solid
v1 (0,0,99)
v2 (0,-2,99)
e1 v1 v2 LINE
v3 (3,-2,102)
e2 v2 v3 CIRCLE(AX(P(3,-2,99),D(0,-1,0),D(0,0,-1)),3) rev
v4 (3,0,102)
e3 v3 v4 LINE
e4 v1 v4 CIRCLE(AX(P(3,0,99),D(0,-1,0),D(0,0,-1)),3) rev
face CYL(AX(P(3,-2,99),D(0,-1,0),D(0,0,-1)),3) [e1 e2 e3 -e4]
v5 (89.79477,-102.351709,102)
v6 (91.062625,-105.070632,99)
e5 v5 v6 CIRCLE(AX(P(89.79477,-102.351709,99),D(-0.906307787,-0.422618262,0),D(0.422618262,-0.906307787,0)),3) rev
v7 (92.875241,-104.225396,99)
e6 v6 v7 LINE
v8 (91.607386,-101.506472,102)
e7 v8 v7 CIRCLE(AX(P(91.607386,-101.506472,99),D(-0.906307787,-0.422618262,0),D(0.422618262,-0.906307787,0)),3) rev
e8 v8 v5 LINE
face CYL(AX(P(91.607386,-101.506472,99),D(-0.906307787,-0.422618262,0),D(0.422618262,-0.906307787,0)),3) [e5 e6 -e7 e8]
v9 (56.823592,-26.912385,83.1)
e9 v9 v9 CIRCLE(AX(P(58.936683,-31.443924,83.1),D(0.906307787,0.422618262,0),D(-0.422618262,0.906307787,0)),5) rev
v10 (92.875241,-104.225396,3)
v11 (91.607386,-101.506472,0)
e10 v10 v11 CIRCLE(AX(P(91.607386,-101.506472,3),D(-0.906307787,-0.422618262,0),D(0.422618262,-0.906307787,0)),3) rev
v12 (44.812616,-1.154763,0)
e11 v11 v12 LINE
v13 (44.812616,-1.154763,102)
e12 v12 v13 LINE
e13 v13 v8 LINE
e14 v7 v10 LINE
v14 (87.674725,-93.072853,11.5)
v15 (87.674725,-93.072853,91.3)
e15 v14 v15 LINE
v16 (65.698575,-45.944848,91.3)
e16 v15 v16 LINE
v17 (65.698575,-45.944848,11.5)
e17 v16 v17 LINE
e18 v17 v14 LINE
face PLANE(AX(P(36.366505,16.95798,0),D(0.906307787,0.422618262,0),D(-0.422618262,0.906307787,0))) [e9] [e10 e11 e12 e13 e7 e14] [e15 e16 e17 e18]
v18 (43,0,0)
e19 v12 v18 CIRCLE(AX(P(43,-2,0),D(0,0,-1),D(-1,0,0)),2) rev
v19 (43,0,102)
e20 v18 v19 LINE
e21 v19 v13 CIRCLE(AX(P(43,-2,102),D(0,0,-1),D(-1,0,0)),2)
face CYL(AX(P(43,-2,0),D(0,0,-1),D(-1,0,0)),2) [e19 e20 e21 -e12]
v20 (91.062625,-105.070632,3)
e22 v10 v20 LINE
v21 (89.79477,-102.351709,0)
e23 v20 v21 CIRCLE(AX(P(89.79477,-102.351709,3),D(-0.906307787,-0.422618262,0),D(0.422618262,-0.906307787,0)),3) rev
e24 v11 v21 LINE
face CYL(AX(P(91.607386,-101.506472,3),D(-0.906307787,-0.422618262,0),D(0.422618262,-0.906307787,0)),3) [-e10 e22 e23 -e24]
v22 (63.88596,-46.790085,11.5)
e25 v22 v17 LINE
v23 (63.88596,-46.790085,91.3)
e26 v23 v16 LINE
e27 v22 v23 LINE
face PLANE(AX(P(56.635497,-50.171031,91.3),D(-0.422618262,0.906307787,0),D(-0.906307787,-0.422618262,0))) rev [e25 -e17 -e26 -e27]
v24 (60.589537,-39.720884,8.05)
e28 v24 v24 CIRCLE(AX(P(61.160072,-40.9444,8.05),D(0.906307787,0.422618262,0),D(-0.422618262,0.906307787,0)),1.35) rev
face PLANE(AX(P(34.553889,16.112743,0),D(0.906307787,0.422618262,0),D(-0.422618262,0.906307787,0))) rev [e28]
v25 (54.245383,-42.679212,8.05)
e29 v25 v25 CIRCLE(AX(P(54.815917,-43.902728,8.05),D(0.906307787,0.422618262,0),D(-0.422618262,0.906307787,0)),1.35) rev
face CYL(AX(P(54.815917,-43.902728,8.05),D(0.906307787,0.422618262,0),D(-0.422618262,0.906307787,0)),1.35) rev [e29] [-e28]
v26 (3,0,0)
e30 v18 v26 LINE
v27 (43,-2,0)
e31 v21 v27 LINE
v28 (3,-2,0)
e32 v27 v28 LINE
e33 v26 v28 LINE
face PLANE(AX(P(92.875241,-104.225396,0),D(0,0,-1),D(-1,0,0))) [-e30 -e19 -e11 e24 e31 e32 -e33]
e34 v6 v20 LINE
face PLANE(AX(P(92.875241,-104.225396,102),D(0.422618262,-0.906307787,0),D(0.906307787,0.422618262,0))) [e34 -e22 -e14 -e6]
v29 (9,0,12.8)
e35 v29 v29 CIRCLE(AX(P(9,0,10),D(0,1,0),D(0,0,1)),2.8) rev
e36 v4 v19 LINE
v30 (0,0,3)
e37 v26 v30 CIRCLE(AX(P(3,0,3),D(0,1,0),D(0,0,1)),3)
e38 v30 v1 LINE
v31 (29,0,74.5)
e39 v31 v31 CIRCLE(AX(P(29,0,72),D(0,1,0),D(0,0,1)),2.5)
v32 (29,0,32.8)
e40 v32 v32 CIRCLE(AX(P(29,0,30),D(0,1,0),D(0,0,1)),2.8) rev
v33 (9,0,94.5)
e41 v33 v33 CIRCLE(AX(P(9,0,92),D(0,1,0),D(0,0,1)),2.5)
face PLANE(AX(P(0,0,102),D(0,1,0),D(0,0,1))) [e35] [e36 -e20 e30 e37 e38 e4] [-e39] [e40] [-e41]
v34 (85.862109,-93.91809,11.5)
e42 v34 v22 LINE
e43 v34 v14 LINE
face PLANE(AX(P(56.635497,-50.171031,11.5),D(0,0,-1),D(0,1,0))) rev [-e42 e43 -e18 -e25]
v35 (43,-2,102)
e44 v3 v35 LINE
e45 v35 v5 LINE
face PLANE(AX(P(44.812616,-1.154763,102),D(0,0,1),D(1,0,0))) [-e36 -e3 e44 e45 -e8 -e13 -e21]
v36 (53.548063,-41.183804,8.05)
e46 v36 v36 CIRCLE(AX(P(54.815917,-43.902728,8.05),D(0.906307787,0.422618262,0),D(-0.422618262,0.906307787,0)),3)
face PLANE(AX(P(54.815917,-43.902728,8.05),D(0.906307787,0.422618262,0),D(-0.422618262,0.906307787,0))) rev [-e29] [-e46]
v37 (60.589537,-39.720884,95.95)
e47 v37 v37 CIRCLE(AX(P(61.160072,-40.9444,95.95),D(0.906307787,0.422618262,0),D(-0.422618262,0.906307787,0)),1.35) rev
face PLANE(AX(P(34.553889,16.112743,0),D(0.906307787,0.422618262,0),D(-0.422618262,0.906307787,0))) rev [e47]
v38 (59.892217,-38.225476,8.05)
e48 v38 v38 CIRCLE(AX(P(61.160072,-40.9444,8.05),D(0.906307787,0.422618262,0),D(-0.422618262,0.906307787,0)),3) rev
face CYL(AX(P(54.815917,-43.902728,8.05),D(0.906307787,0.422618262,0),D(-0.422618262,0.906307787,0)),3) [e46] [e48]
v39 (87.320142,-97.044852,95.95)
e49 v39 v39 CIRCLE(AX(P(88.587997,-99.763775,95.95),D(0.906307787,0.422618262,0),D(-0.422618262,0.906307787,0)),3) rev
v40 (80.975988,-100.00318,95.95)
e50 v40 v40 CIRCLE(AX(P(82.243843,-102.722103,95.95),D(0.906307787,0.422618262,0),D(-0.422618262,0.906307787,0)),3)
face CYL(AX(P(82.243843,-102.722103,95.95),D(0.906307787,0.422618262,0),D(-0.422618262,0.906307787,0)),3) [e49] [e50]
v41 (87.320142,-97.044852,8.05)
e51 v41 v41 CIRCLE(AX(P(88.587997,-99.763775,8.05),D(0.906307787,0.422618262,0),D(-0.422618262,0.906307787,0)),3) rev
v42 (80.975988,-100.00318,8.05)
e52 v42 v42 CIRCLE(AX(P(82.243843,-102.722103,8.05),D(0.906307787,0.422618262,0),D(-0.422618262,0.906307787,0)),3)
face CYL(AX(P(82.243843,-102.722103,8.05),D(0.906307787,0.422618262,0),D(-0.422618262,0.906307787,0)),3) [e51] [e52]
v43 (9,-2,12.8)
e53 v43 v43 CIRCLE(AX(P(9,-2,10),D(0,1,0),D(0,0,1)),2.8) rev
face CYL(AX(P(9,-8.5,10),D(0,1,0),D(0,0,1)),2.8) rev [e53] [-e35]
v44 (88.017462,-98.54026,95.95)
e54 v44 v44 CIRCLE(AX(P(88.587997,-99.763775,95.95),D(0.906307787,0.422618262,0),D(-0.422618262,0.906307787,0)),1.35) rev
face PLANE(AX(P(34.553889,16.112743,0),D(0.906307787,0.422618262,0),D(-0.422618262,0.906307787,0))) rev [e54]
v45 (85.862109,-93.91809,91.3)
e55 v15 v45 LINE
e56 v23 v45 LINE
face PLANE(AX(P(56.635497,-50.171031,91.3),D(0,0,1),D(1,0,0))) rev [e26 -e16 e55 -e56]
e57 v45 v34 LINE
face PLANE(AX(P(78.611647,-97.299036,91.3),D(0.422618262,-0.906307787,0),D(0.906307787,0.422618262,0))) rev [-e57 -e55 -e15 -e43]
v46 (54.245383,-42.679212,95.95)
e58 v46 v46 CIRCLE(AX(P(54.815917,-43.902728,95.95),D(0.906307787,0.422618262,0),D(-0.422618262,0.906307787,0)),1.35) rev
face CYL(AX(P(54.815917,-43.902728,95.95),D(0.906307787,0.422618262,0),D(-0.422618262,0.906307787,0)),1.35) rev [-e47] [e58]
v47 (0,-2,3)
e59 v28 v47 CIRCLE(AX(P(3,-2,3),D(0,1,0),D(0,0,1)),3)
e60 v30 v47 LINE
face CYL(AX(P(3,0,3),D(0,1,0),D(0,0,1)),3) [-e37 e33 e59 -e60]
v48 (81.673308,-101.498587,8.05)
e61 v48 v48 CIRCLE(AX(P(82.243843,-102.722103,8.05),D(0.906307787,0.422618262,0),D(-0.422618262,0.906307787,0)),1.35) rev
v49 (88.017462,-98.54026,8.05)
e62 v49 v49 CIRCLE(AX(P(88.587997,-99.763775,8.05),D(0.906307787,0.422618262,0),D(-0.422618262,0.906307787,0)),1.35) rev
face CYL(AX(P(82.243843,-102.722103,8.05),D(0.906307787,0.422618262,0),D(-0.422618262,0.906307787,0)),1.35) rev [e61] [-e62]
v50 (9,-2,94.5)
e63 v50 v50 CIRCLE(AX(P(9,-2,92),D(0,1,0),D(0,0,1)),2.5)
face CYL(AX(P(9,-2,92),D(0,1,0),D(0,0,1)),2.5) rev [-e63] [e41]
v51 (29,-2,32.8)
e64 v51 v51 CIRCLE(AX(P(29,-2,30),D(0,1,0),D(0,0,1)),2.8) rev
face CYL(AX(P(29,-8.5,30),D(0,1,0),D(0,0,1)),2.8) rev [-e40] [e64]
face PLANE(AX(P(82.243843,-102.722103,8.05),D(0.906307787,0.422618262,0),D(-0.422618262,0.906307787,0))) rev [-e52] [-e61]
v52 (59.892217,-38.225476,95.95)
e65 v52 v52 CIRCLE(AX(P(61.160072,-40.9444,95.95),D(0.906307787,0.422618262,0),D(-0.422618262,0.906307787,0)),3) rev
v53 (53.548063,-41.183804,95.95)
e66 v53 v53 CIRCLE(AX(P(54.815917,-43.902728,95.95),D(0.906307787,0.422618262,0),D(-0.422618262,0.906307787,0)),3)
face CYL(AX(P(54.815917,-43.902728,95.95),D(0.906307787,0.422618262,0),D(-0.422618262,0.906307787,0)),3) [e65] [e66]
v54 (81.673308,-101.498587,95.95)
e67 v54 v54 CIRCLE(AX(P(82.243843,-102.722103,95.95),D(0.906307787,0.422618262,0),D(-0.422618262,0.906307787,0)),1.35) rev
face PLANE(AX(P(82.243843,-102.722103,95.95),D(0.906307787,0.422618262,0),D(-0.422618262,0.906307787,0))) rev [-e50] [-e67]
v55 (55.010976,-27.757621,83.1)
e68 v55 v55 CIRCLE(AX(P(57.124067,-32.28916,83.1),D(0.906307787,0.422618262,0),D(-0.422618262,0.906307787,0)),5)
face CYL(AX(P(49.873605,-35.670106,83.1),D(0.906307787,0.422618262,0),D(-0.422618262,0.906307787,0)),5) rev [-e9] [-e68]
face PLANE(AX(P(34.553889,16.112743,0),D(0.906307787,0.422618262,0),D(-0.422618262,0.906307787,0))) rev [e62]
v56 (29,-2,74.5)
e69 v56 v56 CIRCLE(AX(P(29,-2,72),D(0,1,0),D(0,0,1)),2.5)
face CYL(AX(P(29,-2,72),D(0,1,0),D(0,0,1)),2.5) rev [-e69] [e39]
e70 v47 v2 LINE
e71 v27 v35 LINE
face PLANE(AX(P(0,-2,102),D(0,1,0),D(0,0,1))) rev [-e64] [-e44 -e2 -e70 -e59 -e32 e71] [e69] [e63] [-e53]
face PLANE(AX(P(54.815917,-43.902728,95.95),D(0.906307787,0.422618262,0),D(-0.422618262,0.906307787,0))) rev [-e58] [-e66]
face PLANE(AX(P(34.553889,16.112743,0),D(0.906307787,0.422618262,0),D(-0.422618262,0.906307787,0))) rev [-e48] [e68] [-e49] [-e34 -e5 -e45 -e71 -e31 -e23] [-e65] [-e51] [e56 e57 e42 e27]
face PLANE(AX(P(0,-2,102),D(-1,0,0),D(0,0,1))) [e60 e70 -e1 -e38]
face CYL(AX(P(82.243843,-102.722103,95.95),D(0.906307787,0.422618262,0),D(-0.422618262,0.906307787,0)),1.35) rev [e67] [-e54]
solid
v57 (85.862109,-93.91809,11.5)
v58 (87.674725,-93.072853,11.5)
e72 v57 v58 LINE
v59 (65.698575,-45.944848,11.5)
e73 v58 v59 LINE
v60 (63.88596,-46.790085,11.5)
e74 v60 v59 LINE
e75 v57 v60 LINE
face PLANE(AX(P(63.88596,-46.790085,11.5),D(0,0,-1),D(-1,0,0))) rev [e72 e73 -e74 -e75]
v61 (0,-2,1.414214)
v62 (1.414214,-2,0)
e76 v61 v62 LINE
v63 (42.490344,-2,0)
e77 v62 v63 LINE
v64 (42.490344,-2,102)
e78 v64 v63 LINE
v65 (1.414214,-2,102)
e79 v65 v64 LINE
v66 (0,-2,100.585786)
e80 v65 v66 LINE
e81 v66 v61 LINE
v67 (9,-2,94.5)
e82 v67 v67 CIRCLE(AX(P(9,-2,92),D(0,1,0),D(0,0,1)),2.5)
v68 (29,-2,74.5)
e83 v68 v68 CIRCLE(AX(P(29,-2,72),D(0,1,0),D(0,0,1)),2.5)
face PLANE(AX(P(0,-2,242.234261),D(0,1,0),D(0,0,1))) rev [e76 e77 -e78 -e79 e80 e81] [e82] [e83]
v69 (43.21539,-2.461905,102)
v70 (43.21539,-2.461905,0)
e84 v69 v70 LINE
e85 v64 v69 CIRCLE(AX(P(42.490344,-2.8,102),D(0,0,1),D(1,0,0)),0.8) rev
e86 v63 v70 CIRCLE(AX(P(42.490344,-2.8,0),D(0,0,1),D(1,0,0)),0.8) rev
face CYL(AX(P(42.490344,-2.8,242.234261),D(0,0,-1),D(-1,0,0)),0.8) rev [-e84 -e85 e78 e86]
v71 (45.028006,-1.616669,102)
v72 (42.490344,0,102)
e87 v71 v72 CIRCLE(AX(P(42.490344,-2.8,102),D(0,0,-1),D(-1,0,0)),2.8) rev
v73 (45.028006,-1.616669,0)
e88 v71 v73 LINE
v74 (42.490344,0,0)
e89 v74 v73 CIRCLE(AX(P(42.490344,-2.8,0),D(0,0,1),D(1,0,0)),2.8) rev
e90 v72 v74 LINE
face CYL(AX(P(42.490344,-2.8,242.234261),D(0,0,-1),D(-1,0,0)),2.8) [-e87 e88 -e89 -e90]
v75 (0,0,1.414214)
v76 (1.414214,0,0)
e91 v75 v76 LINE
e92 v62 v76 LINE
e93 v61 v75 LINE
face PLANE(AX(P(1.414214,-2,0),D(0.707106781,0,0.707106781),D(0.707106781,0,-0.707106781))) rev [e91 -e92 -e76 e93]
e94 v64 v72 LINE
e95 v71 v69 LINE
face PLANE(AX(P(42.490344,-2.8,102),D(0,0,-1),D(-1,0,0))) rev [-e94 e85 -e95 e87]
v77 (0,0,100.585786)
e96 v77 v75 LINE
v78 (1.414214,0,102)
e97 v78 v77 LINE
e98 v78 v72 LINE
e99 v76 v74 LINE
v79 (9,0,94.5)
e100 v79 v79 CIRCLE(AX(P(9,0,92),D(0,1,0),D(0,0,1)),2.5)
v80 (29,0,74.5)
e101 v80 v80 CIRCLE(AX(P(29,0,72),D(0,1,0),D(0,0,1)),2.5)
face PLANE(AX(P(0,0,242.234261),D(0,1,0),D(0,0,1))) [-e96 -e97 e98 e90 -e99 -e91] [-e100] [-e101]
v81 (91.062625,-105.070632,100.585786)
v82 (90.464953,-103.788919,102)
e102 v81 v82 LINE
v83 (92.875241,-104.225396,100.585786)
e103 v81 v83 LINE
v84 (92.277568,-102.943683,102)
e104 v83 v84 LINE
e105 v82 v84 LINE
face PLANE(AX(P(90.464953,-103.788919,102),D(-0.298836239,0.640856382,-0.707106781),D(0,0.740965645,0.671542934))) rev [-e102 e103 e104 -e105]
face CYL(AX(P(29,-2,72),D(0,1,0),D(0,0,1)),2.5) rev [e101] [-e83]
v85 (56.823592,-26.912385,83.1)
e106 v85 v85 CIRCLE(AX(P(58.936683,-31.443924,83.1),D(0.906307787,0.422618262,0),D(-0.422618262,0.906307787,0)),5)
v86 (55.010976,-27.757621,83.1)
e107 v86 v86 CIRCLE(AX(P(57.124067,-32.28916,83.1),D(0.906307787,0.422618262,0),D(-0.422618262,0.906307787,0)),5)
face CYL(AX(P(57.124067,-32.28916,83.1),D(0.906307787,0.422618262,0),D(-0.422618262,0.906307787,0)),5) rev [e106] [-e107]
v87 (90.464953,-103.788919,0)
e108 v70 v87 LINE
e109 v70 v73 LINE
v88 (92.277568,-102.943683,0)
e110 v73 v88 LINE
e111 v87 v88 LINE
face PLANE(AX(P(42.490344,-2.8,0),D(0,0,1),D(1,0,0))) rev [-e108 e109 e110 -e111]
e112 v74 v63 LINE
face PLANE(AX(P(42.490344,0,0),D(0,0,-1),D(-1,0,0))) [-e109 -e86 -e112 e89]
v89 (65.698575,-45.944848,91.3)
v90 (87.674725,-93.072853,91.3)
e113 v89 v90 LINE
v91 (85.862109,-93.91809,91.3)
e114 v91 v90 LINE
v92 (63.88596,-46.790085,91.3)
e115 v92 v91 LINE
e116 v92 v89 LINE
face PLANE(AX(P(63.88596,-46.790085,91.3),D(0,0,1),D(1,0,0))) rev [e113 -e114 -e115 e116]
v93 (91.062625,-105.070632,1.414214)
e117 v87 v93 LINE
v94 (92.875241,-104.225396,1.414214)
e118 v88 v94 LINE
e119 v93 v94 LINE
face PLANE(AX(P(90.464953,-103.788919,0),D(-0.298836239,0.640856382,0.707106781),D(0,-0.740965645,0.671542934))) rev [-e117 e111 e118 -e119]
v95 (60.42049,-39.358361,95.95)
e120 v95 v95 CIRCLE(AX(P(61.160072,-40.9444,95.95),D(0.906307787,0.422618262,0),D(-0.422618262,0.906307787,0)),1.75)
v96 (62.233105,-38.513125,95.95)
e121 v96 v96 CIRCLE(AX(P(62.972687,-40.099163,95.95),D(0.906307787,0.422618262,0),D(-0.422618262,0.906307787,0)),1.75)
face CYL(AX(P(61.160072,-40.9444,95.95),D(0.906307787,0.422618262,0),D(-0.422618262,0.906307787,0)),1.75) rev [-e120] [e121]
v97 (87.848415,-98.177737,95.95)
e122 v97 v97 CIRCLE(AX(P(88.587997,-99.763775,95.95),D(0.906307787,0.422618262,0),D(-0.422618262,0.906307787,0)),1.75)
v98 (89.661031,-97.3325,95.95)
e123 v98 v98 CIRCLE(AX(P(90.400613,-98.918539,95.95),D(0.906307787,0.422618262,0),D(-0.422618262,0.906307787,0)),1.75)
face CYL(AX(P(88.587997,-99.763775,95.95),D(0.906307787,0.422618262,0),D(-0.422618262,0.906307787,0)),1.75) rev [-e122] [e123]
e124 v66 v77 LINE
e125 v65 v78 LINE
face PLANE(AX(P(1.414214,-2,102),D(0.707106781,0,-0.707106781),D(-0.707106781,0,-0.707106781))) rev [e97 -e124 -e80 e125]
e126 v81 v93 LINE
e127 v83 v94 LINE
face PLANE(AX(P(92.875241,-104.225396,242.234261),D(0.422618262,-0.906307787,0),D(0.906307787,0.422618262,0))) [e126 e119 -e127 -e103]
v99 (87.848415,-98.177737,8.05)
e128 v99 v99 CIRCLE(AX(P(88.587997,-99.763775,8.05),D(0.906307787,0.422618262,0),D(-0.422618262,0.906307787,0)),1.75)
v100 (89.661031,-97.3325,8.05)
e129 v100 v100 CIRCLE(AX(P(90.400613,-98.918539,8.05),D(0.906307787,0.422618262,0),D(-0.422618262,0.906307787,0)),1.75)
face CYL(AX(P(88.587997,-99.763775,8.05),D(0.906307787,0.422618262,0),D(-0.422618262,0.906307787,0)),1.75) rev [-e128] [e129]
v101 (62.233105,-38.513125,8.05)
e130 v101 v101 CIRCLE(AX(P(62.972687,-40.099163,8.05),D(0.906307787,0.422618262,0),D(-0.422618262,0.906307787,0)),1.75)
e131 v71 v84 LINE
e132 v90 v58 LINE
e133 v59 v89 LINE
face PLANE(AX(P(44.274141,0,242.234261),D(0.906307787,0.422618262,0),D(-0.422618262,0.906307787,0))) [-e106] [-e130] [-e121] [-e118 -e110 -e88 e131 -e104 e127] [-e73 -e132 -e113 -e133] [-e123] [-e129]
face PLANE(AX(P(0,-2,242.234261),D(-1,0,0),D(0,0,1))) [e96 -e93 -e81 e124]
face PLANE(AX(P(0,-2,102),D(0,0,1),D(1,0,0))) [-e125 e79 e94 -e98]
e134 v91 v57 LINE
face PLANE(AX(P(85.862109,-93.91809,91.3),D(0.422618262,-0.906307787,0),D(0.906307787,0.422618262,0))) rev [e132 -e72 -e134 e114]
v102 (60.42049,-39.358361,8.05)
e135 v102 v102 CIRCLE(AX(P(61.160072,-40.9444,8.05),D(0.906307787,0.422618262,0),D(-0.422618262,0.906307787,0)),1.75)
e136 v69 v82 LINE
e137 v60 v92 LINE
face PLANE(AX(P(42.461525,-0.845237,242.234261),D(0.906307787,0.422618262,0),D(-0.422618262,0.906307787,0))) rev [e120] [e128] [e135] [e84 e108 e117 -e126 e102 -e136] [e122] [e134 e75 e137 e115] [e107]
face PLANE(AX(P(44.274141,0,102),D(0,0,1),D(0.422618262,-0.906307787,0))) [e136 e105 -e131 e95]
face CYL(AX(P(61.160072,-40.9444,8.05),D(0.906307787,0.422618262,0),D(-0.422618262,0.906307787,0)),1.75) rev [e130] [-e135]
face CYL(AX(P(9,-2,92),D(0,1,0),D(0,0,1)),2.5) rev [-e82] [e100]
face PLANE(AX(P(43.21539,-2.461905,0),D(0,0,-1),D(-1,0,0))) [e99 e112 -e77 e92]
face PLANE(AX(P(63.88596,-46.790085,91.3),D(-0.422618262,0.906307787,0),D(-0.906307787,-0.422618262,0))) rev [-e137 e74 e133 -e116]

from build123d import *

# Parameters (mm, degrees)
BASE_FLANGE1_DEPTH         = 102
BASE_FLANGE1_START         = 31.125998319
BASE_FLANGE1_2_OUTLINE_R   = 3
BASE_FLANGE1_2_OUTLINE_R_2 = 1.35
BASE_FLANGE1_2_DEPTH       = 9
BASE_FLANGE1_START_2       = 38.125998319
BASE_FLANGE1_3_OUTLINE_R   = 1.35
BASE_FLANGE1_3_DEPTH       = 2
BASE_FLANGE1_4_DEPTH       = 102
BASE_FLANGE1_5_DEPTH       = 11.5
BASE_FLANGE1_START_3       = 91.3
BASE_FLANGE1_6_DEPTH       = 10.7
BASE_FLANGE1_START_4       = -2
BASE_FLANGE1_7_OUTLINE_R   = 2.8
BASE_FLANGE1_7_DEPTH       = 2
BASE_FLANGE1_START_5       = 0.638380538
BASE_FLANGE1_8_OUTLINE_R   = 5
BASE_FLANGE1_8_DEPTH       = 40.361619462
SKETCH6_R                  = 5
SKETCH6_W                  = 79.8
SKETCH6_H                  = 52
CUT_EXTRUDE1_DEPTH         = 10
SKETCH7_R                  = 2.5
CUT_EXTRUDE2_DEPTH         = 10
CUT_EXTRUDE3_DEPTH         = 10
CUT_EXTRUDE4_DEPTH         = 10
SKETCH10_R                 = 1.75
CUT_EXTRUDE5_DEPTH         = 10


with BuildPart() as part:
    # Base-Flange1: read off the stored shape, not the designer's step
    # Base-Flange1 outline → Base-Flange1 (new body)
    with BuildSketch(Plane.XY):
        with BuildLine():
            Line((43.215390021, -2.461905391), (91.062625048, -105.070632033))
            Line((91.062625048, -105.070632033), (92.875240622, -104.225395509))
            Line((92.875240622, -104.225395509), (45.028005595, -1.616668867))
            ThreePointArc((45.028005595, -1.616668867), (43.994782694, -0.438503952), (42.490343791, 0))
            Line((42.490343791, 0), (0, 0))
            Line((0, 0), (0, -2))
            Line((0, -2), (42.490343791, -2))
            ThreePointArc((42.490343791, -2), (42.920183478, -2.125286843), (43.215390021, -2.461905391))
        make_face()
    extrude(amount=BASE_FLANGE1_DEPTH)

    # Sketch6 → Cut-Extrude1 (cut)
    with BuildSketch(Plane(origin=(36.366504739, 16.95797966, 0), x_dir=(0, 0, -1), z_dir=(0.906307787036648, 0.4226182617407039, 0))):
        with Locations(Location((-83.1, -53.405591591, 0), (0, 0, 90))):
            Circle(SKETCH6_R)
        with Locations((-51.4, -95.405591591)):
            Rectangle(SKETCH6_W, SKETCH6_H)
    extrude(amount=-CUT_EXTRUDE1_DEPTH, mode=Mode.SUBTRACT)


with BuildPart() as body_2:
    # Base-Flange1 2 outline → Base-Flange1 2 (new body)
    # profile 1 of 4: a face of its own
    with BuildSketch(Plane(origin=(0, 0, 0), x_dir=(-0.422618261740704, 0.9063077870366479, 0), z_dir=(0.9063077870366479, 0.42261826174070394, 0)).offset(BASE_FLANGE1_START)):
        with Locations((-62.955591591, 8.05)):
            Circle(BASE_FLANGE1_2_OUTLINE_R)
        with Locations((-62.955591591, 8.05)):
            Circle(BASE_FLANGE1_2_OUTLINE_R_2, mode=Mode.SUBTRACT)
    # profile 2 of 4: a face of its own
    with BuildSketch(Plane(origin=(0, 0, 0), x_dir=(-0.422618261740704, 0.9063077870366479, 0), z_dir=(0.9063077870366479, 0.42261826174070394, 0)).offset(BASE_FLANGE1_START)):
        with Locations((-127.855591591, 8.05)):
            Circle(BASE_FLANGE1_2_OUTLINE_R)
        with Locations((-127.855591591, 8.05)):
            Circle(BASE_FLANGE1_2_OUTLINE_R_2, mode=Mode.SUBTRACT)
    # profile 3 of 4: a face of its own
    with BuildSketch(Plane(origin=(0, 0, 0), x_dir=(-0.422618261740704, 0.9063077870366479, 0), z_dir=(0.9063077870366479, 0.42261826174070394, 0)).offset(BASE_FLANGE1_START)):
        with Locations((-127.855591591, 95.95)):
            Circle(BASE_FLANGE1_2_OUTLINE_R)
        with Locations((-127.855591591, 95.95)):
            Circle(BASE_FLANGE1_2_OUTLINE_R_2, mode=Mode.SUBTRACT)
    # profile 4 of 4: a face of its own
    with BuildSketch(Plane(origin=(0, 0, 0), x_dir=(-0.422618261740704, 0.9063077870366479, 0), z_dir=(0.9063077870366479, 0.42261826174070394, 0)).offset(BASE_FLANGE1_START)):
        with Locations((-62.955591591, 95.95)):
            Circle(BASE_FLANGE1_2_OUTLINE_R)
        with Locations((-62.955591591, 95.95)):
            Circle(BASE_FLANGE1_2_OUTLINE_R_2, mode=Mode.SUBTRACT)
    extrude(amount=BASE_FLANGE1_2_DEPTH)

    # Base-Flange1 3 outline → Base-Flange1 3 (add)
    with BuildSketch(Plane(origin=(0, 0, 0), x_dir=(-0.422618261740704, 0.9063077870366479, 0), z_dir=(0.9063077870366479, 0.42261826174070394, 0)).offset(BASE_FLANGE1_START_2)):
        with Locations((-62.955591591, 8.05)):
            Circle(BASE_FLANGE1_3_OUTLINE_R)
        with Locations((-127.855591591, 8.05)):
            Circle(BASE_FLANGE1_3_OUTLINE_R)
        with Locations((-127.855591591, 95.95)):
            Circle(BASE_FLANGE1_3_OUTLINE_R)
        with Locations((-62.955591591, 95.95)):
            Circle(BASE_FLANGE1_3_OUTLINE_R)
    extrude(amount=BASE_FLANGE1_3_DEPTH)

    # Base-Flange1 4 outline → Base-Flange1 4 (add)
    with BuildSketch(Plane.XY):
        Polygon((85.862109249, -93.918089912), (91.062625048, -105.070632033), (92.875240622, -104.225395509), (87.674724823, -93.072853389), align=None)
        with BuildLine():
            Line((43, -2), (63.885959638, -46.790084986))
            Line((63.885959638, -46.790084986), (65.698575212, -45.944848463))
            Line((65.698575212, -45.944848463), (44.812615574, -1.154763477))
            ThreePointArc((44.812615574, -1.154763477), (44.074599217, -0.313217108), (43, 0))
            Line((43, 0), (0, 0))
            Line((0, 0), (0, -2))
            Line((0, -2), (43, -2))
        make_face()
    extrude(amount=BASE_FLANGE1_4_DEPTH)

    # Base-Flange1 5 outline → Base-Flange1 5 (add)
    with BuildSketch(Plane.XY):
        Polygon((63.885959638, -46.790084986), (85.862109249, -93.918089912), (87.674724823, -93.072853389), (65.698575213, -45.944848463), align=None)
    extrude(amount=BASE_FLANGE1_5_DEPTH)

    # Base-Flange1 6 outline → Base-Flange1 6 (add)
    with BuildSketch(Plane.XY.offset(BASE_FLANGE1_START_3)):
        Polygon((63.885959638, -46.790084986), (85.862109249, -93.918089912), (87.674724823, -93.072853389), (65.698575213, -45.944848463), align=None)
    extrude(amount=BASE_FLANGE1_6_DEPTH)

    # Base-Flange1 7 outline → Base-Flange1 7 (cut)
    with BuildSketch(Plane(origin=(0, 0, 0), x_dir=(1, 0, 0), z_dir=(0, 1, 0)).offset(BASE_FLANGE1_START_4)):
        with Locations((29, -30)):
            Circle(BASE_FLANGE1_7_OUTLINE_R)
        with Locations((9, -10)):
            Circle(BASE_FLANGE1_7_OUTLINE_R)
        with BuildLine():
            ThreePointArc((3, -102), (0.878679656, -101.121320344), (0, -99))
            Line((0, -99), (0, -102))
            Line((0, -102), (3, -102))
        make_face()
        with BuildLine():
            ThreePointArc((0, -3), (0.878679656, -0.878679656), (3, 0))
            Line((3, 0), (0, 0))
            Line((0, 0), (0, -3))
        make_face()
    extrude(amount=BASE_FLANGE1_7_DEPTH, mode=Mode.SUBTRACT)

    # Base-Flange1 8 outline → Base-Flange1 8 (cut)
    with BuildSketch(Plane(origin=(0, 0, 0), x_dir=(-0.422618261740704, 0.9063077870366479, 0), z_dir=(0.9063077870366479, 0.42261826174070394, 0)).offset(BASE_FLANGE1_START_5)):
        with Locations((-53.405591591, 83.1)):
            Circle(BASE_FLANGE1_8_OUTLINE_R)
        with BuildLine():
            Line((-133.711060308, 0), (-130.711060307, 0))
            ThreePointArc((-130.711060307, 0), (-132.832380651, 0.878679656), (-133.711060307, 3))
            Line((-133.711060307, 3), (-133.711060308, 0))
        make_face()
        with BuildLine():
            Line((-133.711060308, 102), (-133.711060307, 99))
            ThreePointArc((-133.711060307, 99), (-132.832380651, 101.121320344), (-130.711060307, 102))
            Line((-130.711060307, 102), (-133.711060308, 102))
        make_face()
    extrude(amount=BASE_FLANGE1_8_DEPTH, mode=Mode.SUBTRACT)


with BuildPart() as cut_extrude2_tool:
    # Sketch7 → Cut-Extrude2 (new body)
    with BuildSketch(Plane(origin=(0, 0, 0), x_dir=(1, 0, 0), z_dir=(0, 1, 0))):
        with Locations(Location((9, -92, 0), (0, 0, 270))):
            Circle(SKETCH7_R)
        with Locations(Location((29, -72, 0), (0, 0, 270))):
            Circle(SKETCH7_R)
    extrude(amount=-CUT_EXTRUDE2_DEPTH)


with BuildPart() as part_1:
    add(part.part)

    # Cut-Extrude2: cut by cut_extrude2_tool
    add(cut_extrude2_tool.part, mode=Mode.SUBTRACT)

    # Sketch8 → Cut-Extrude3 (cut)
    with BuildSketch(Plane(origin=(36.366504739, 16.95797966, 0), x_dir=(0, 0, -1), z_dir=(0.906307787036648, 0.4226182617407039, 0))):
        Polygon((-102, -133.711060307), (-102, -132.296846745), (-100.585786438, -133.711060307), align=None)
        Polygon((-1.414213562, -133.711060307), (0, -133.711060307), (0, -132.296846745), align=None)
    extrude(amount=-CUT_EXTRUDE3_DEPTH, mode=Mode.SUBTRACT)

    # Sketch9 → Cut-Extrude4 (cut)
    with BuildSketch(Plane(origin=(0, 0, 0), x_dir=(1, 0, 0), z_dir=(0, 1, 0))):
        Polygon((0, 0), (1.414213562, 0), (0, -1.414213562), align=None)
        Polygon((0, -100.585786438), (0, -102), (1.414213562, -102), align=None)
    extrude(amount=-CUT_EXTRUDE4_DEPTH, mode=Mode.SUBTRACT)

    # Sketch10 → Cut-Extrude5 (cut)
    with BuildSketch(Plane(origin=(36.366504739, 16.95797966, 0), x_dir=(0, 0, -1), z_dir=(0.906307787036648, 0.4226182617407039, 0))):
        with Locations(Location((-95.95, -62.955591591, 0), (0, 0, 90))):
            Circle(SKETCH10_R)
        with Locations(Location((-8.05, -62.955591591, 0), (0, 0, 90))):
            Circle(SKETCH10_R)
        with Locations(Location((-95.95, -127.855591591, 0), (0, 0, 90))):
            Circle(SKETCH10_R)
        with Locations(Location((-8.05, -127.855591591, 0), (0, 0, 90))):
            Circle(SKETCH10_R)
    extrude(amount=-CUT_EXTRUDE5_DEPTH, mode=Mode.SUBTRACT)


with BuildPart() as body_2_1:
    add(body_2.part)

    # Cut-Extrude2: cut by cut_extrude2_tool
    add(cut_extrude2_tool.part, mode=Mode.SUBTRACT)


solid = Compound([part_1.part, body_2_1.part])
